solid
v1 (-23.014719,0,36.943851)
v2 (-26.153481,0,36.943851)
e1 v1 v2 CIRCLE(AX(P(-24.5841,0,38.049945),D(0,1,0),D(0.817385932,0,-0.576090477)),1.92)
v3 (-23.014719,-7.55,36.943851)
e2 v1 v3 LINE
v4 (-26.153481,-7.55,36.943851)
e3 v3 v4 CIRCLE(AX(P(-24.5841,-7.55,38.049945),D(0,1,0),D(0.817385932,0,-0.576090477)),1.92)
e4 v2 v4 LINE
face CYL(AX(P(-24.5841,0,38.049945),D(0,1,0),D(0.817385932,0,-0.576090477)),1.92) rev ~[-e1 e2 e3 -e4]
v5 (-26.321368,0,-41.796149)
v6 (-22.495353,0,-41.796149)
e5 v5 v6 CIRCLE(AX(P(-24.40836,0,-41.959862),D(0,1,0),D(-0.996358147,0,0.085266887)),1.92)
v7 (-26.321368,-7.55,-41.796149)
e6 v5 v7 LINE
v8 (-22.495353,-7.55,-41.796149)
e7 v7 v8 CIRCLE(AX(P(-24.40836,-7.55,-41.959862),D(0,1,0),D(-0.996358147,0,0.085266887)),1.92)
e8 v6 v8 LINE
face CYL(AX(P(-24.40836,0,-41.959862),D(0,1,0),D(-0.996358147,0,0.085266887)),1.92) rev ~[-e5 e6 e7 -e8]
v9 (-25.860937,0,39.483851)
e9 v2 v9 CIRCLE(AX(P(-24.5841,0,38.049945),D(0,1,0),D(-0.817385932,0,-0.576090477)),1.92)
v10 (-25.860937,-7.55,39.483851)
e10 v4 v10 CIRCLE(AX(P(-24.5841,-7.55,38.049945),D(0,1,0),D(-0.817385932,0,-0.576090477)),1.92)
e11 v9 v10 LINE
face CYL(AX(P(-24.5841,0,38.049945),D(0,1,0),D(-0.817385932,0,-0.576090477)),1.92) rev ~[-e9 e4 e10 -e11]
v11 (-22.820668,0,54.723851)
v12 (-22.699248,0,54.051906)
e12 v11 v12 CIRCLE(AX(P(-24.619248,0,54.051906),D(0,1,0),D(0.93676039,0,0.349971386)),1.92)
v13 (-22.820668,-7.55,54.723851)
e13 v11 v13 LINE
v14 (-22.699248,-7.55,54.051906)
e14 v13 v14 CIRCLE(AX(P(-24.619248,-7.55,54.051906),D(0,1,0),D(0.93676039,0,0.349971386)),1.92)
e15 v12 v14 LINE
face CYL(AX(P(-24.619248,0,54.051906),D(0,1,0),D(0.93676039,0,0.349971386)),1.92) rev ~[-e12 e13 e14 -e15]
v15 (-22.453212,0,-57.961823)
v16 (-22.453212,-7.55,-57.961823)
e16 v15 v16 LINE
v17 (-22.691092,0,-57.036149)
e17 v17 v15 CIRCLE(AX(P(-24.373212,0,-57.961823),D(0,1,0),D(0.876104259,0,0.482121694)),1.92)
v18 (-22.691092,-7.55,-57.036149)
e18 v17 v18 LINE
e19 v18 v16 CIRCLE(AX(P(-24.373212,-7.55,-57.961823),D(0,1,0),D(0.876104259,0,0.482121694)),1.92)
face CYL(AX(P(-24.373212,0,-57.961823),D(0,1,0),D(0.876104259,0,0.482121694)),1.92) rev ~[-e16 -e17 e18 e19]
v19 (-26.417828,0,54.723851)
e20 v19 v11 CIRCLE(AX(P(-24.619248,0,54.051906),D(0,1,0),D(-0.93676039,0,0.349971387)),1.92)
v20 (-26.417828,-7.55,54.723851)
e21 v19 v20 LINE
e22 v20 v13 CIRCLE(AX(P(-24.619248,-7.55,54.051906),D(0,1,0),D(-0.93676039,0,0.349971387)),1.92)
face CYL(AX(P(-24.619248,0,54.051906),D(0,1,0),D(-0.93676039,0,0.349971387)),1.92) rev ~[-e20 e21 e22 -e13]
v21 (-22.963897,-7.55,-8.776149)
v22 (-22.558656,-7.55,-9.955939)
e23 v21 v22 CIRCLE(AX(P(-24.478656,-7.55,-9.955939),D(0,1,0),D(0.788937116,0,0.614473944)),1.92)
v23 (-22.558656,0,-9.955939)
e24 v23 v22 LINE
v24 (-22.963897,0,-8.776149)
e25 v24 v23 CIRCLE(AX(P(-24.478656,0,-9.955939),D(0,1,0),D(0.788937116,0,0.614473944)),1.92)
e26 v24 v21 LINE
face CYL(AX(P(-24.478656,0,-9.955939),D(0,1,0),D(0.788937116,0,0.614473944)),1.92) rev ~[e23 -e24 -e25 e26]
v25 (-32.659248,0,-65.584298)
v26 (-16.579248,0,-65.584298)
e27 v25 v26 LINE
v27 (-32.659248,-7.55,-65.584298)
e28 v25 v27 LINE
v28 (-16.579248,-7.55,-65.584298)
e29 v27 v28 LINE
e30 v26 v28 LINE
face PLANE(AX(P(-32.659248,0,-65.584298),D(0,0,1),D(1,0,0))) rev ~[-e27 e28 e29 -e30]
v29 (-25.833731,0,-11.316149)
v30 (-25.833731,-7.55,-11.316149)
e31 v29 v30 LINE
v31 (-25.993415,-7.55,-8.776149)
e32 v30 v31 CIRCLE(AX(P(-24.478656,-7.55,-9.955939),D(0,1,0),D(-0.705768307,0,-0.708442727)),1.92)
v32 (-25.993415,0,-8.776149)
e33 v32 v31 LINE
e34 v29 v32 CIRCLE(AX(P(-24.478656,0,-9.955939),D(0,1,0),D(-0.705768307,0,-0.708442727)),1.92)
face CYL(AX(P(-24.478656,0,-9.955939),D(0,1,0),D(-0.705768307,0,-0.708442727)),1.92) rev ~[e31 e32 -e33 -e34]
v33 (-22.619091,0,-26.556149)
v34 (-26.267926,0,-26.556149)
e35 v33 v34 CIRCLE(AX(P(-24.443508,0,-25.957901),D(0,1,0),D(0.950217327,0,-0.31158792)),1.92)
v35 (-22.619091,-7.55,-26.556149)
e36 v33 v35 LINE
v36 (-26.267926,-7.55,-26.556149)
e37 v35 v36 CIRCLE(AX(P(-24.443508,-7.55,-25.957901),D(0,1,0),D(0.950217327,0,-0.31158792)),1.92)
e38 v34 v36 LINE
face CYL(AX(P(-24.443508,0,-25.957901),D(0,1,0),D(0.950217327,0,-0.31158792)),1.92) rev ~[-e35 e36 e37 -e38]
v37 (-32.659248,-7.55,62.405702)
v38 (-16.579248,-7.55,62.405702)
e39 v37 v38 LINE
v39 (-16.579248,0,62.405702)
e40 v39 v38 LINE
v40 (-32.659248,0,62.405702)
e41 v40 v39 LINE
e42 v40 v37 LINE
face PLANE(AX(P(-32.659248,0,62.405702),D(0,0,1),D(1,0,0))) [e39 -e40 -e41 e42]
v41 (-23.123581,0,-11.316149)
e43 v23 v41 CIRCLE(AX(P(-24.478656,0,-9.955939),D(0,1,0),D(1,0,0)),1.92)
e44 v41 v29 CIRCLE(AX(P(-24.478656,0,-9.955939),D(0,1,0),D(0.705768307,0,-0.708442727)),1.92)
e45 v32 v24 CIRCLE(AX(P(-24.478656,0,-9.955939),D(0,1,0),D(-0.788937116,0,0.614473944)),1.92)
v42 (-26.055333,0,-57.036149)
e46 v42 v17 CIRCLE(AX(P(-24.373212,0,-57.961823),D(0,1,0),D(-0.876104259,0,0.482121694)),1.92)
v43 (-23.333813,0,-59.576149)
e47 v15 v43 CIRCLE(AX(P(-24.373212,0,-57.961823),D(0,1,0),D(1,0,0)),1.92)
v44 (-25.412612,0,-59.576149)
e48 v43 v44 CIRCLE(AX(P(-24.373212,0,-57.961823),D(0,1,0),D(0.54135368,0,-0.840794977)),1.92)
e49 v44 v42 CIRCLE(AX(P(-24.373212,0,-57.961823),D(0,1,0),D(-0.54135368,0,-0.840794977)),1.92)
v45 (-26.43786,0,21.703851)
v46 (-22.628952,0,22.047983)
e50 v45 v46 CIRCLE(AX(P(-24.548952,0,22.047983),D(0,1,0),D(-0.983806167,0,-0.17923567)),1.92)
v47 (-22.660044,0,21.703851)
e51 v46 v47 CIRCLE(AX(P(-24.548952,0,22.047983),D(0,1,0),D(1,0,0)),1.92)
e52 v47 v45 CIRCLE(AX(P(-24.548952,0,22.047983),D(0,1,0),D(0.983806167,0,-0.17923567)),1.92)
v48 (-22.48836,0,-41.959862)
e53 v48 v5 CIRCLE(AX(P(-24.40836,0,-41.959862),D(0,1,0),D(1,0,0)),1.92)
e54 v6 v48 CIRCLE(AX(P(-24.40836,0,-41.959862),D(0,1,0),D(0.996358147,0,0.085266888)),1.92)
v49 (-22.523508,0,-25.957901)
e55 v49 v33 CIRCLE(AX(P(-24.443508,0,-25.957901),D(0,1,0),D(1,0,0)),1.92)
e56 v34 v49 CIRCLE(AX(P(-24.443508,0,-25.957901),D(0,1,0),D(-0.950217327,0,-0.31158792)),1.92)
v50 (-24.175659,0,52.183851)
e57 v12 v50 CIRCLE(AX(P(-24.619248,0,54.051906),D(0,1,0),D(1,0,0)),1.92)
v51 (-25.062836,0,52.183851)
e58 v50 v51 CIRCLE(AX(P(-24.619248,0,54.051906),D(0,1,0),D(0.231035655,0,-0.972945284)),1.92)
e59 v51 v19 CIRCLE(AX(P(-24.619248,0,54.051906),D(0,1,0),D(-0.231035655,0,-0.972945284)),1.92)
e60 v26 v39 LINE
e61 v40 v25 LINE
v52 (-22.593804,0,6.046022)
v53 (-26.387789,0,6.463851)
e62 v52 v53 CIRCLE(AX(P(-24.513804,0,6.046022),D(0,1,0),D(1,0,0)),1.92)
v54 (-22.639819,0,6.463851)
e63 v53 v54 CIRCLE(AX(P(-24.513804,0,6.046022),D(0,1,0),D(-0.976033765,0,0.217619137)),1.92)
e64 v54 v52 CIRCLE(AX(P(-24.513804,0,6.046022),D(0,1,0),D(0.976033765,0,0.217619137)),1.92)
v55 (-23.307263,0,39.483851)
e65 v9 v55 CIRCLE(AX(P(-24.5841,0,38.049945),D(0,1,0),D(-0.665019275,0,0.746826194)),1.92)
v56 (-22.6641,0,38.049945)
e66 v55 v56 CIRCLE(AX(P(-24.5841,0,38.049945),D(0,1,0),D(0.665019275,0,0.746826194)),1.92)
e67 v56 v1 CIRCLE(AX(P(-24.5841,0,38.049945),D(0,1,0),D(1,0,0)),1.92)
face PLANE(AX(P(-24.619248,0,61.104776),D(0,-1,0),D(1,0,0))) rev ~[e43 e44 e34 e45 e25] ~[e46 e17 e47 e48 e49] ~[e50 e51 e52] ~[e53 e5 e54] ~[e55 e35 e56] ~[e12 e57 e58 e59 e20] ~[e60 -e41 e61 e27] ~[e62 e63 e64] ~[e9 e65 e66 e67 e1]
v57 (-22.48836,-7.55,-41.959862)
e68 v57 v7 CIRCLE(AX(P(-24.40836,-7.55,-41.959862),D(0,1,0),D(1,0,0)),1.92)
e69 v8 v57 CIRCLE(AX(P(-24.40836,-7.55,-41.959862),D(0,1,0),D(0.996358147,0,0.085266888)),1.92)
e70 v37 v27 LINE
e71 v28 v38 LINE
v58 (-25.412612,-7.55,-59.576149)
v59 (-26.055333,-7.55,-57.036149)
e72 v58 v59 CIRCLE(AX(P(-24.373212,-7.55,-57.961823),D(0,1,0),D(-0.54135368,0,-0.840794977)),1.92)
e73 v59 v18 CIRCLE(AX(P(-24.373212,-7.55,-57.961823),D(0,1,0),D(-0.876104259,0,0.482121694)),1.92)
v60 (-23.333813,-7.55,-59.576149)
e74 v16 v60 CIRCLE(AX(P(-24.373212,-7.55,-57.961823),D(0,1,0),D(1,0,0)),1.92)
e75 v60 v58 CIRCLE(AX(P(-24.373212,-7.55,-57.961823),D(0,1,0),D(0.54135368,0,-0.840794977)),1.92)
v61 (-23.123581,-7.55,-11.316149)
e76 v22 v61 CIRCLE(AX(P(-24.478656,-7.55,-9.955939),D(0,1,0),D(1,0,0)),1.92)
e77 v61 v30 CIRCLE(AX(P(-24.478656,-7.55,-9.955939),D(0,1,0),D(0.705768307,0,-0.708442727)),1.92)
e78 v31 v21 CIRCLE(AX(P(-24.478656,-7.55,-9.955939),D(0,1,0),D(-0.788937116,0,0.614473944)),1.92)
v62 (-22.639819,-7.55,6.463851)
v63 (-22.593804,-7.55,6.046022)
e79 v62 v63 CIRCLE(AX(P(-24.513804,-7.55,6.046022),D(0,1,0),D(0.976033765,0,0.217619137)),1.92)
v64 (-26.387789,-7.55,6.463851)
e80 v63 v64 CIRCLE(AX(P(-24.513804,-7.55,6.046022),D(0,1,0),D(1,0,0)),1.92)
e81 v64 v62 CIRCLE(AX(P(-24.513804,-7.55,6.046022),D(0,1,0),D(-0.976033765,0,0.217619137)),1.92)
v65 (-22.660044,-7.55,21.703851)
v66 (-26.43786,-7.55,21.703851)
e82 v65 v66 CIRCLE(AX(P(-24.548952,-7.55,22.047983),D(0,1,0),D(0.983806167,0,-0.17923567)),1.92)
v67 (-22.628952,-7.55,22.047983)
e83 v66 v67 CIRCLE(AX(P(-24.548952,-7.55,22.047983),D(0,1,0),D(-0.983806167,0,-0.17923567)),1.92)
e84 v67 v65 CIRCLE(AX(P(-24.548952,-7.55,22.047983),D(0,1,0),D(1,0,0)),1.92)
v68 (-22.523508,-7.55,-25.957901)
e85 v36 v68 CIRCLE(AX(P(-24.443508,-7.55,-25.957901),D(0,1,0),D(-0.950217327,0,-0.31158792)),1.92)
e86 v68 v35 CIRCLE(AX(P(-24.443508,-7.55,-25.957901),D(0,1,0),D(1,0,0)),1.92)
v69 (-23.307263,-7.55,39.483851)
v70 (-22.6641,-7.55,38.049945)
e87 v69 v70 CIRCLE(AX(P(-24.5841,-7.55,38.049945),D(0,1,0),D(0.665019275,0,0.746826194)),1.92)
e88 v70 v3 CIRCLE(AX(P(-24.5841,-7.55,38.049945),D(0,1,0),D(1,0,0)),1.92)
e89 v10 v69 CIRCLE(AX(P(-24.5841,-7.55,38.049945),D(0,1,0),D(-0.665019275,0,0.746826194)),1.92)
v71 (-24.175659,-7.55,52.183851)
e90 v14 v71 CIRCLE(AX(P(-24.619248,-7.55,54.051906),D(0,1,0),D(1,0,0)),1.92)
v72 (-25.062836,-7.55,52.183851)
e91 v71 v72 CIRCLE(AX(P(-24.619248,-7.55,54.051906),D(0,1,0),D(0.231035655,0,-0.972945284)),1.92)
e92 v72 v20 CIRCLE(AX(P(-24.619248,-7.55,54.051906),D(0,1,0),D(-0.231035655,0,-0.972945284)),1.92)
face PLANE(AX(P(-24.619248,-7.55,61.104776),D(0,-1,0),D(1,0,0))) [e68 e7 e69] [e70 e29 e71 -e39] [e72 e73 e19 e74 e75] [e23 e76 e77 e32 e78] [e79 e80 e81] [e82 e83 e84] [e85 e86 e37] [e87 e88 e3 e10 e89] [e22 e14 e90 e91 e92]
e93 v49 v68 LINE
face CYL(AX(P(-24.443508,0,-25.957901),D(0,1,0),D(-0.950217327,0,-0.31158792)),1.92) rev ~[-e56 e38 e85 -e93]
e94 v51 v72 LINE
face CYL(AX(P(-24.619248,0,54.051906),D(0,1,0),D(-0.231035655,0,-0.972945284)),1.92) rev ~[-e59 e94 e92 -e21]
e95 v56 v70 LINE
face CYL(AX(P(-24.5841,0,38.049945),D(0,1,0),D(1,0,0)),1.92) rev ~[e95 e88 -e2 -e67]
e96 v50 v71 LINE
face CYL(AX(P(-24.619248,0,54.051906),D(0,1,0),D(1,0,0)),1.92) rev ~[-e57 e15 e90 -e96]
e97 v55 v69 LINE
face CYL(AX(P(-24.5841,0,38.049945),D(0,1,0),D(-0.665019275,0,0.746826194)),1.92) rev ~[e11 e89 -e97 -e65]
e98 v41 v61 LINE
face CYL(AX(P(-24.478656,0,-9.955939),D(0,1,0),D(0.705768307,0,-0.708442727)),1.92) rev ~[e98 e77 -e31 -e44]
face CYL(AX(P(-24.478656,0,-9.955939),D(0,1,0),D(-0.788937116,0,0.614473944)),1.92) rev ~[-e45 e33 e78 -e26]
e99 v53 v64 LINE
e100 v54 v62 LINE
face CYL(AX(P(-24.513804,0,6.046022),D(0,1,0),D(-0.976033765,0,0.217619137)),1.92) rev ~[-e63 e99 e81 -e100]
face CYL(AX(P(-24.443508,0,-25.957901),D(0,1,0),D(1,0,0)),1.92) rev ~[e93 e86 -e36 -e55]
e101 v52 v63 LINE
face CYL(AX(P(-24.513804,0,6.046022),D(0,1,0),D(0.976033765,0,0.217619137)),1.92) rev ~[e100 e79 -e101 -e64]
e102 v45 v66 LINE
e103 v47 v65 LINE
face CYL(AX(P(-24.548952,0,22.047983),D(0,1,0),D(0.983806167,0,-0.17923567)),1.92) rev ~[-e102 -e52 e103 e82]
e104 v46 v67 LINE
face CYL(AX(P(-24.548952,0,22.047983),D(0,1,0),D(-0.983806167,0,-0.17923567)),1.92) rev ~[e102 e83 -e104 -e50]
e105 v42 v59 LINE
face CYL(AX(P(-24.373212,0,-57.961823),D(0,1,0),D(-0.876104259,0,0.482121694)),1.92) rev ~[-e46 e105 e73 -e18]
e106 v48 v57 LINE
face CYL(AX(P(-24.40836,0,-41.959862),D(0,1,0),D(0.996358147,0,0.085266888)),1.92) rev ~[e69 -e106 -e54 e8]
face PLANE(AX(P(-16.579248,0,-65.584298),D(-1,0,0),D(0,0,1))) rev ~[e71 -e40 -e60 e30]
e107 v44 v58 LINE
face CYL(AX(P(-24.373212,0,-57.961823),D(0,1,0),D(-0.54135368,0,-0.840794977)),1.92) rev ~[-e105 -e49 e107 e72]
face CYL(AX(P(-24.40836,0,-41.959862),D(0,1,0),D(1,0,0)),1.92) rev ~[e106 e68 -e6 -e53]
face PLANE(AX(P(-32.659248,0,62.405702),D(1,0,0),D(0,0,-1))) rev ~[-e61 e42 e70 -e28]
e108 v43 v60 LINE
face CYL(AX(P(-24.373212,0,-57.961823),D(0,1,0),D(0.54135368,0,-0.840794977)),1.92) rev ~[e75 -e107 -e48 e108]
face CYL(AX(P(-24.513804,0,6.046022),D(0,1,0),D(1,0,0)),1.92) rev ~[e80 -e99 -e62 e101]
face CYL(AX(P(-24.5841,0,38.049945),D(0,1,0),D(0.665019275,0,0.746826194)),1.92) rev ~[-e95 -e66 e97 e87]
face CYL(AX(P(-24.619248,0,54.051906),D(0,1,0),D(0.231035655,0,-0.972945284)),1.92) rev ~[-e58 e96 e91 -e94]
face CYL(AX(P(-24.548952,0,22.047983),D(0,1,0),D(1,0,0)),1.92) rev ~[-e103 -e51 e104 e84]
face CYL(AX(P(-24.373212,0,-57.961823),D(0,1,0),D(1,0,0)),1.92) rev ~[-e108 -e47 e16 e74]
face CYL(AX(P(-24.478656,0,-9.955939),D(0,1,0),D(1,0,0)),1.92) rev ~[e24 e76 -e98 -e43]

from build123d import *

# Parameters (mm, degrees)
F0_W     = 16.08
F0_H     = 2.6018508029
F1_DEPTH = 7.55


# Not quite as in the source:
# - the program builds the solid bodies; features that only make, move or delete a surface that nothing else refers to are left out


with BuildPart() as f1:
    # F0 (on Front) → F1 (new body)
    with BuildSketch(Plane.XZ):
        with Locations((-24.6192478486, 61.1047763503)):
            Rectangle(F0_W, F0_H)
        with BuildLine():
            Line((-16.5792478486, 59.8038509488), (-32.6592478486, 59.8038509488))
            Line((-32.6592478486, 59.8038509488), (-32.6592478486, 57.2638509407))
            Line((-32.6592478486, 57.2638509407), (-32.6592478486, 54.7238509326))
            Line((-32.6592478486, 54.7238509326), (-26.4178277978, 54.7238509326))
            ThreePointArc((-26.4178277978, 54.7238509326), (-24.6192478486, 55.9719058704), (-22.8206678995, 54.7238509326))
            ThreePointArc((-22.8206678995, 54.7238509326), (-22.7298466866, 54.3933194742), (-22.6992478486, 54.0519058704))
            ThreePointArc((-22.6992478486, 54.0519058704), (-23.1129129196, 52.8613786421), (-24.1756593919, 52.1838509245))
            ThreePointArc((-24.1756593919, 52.1838509245), (-24.6192478486, 52.1319058704), (-25.0628363054, 52.1838509245))
            Line((-25.0628363054, 52.1838509245), (-32.6592478486, 52.1838509245))
            Line((-32.6592478486, 52.1838509245), (-32.6592478486, 49.6438509164))
            Line((-32.6592478486, 49.6438509164), (-32.6592478486, 47.1038509083))
            Line((-32.6592478486, 47.1038509083), (-32.6592478486, 44.5638509002))
            Line((-32.6592478486, 44.5638509002), (-32.6592478486, 42.0238508921))
            Line((-32.6592478486, 42.0238508921), (-32.6592478486, 39.483850884))
            Line((-32.6592478486, 39.483850884), (-25.86093695, 39.483850884))
            ThreePointArc((-25.86093695, 39.483850884), (-24.5840999414, 39.9699445923), (-23.3072629328, 39.483850884))
            ThreePointArc((-23.3072629328, 39.483850884), (-22.8322541924, 38.8357158514), (-22.6640999414, 38.0499445923))
            ThreePointArc((-22.6640999414, 38.0499445923), (-22.7538524855, 37.4697771596), (-23.0147189518, 36.9438508759))
            ThreePointArc((-23.0147189518, 36.9438508759), (-24.5840999414, 36.1299445923), (-26.1534809311, 36.9438508759))
            Line((-26.1534809311, 36.9438508759), (-32.6592478486, 36.9438508759))
            Line((-32.6592478486, 36.9438508759), (-32.6592478486, 34.4038508678))
            Line((-32.6592478486, 34.4038508678), (-32.6592478486, 31.8638508597))
            Line((-32.6592478486, 31.8638508597), (-32.6592478486, 29.3238508516))
            Line((-32.6592478486, 29.3238508516), (-32.6592478486, 26.7838508435))
            Line((-32.6592478486, 26.7838508435), (-32.6592478486, 24.2438508354))
            Line((-32.6592478486, 24.2438508354), (-32.6592478486, 21.7038508273))
            Line((-32.6592478486, 21.7038508273), (-32.6592478486, 19.1638508192))
            Line((-32.6592478486, 19.1638508192), (-32.6592478486, 16.623850811))
            Line((-32.6592478486, 16.623850811), (-32.6592478486, 14.0838508029))
            Line((-32.6592478486, 14.0838508029), (-32.6592478486, 11.5438507948))
            Line((-32.6592478486, 11.5438507948), (-32.6592478486, 9.0038507867))
            Line((-32.6592478486, 9.0038507867), (-32.6592478486, 6.4638507786))
            Line((-32.6592478486, 6.4638507786), (-32.6592478486, 3.9238507705))
            Line((-32.6592478486, 3.9238507705), (-32.6592478486, 1.3838507624))
            Line((-32.6592478486, 1.3838507624), (-32.6592478486, -1.1561492457))
            Line((-32.6592478486, -1.1561492457), (-32.6592478486, -3.6961492538))
            Line((-32.6592478486, -3.6961492538), (-32.6592478486, -6.2361492619))
            Line((-32.6592478486, -6.2361492619), (-32.6592478486, -8.77614927))
            Line((-32.6592478486, -8.77614927), (-25.9934154817, -8.77614927))
            ThreePointArc((-25.9934154817, -8.77614927), (-24.4786562199, -8.0359392423), (-22.9638969581, -8.77614927))
            ThreePointArc((-22.9638969581, -8.77614927), (-22.6627903407, -9.3322156588), (-22.5586562199, -9.9559392423))
            ThreePointArc((-22.5586562199, -9.9559392423), (-22.705503056, -10.6923683681), (-23.1235810713, -11.3161492781))
            ThreePointArc((-23.1235810713, -11.3161492781), (-24.4786562199, -11.8759392423), (-25.8337313686, -11.3161492781))
            Line((-25.8337313686, -11.3161492781), (-32.6592478486, -11.3161492781))
            Line((-32.6592478486, -11.3161492781), (-32.6592478486, -13.8561492862))
            Line((-32.6592478486, -13.8561492862), (-32.6592478486, -16.3961492943))
            Line((-32.6592478486, -16.3961492943), (-32.6592478486, -18.9361493024))
            Line((-32.6592478486, -18.9361493024), (-32.6592478486, -21.4761493105))
            Line((-32.6592478486, -21.4761493105), (-32.6592478486, -24.0161493186))
            Line((-32.6592478486, -24.0161493186), (-32.6592478486, -26.5561493267))
            Line((-32.6592478486, -26.5561493267), (-32.6592478486, -29.0961493348))
            Line((-32.6592478486, -29.0961493348), (-32.6592478486, -31.6361493429))
            Line((-32.6592478486, -31.6361493429), (-32.6592478486, -34.176149351))
            Line((-32.6592478486, -34.176149351), (-32.6592478486, -36.7161493591))
            Line((-32.6592478486, -36.7161493591), (-32.6592478486, -39.2561493672))
            Line((-32.6592478486, -39.2561493672), (-32.6592478486, -41.7961493753))
            Line((-32.6592478486, -41.7961493753), (-32.6592478486, -44.3361493834))
            Line((-32.6592478486, -44.3361493834), (-32.6592478486, -46.8761493915))
            Line((-32.6592478486, -46.8761493915), (-32.6592478486, -49.4161493996))
            Line((-32.6592478486, -49.4161493996), (-32.6592478486, -51.9561494077))
            Line((-32.6592478486, -51.9561494077), (-32.6592478486, -54.4961494159))
            Line((-32.6592478486, -54.4961494159), (-32.6592478486, -57.036149424))
            Line((-32.6592478486, -57.036149424), (-26.0553326749, -57.036149424))
            ThreePointArc((-26.0553326749, -57.036149424), (-24.3732124984, -56.0418230768), (-22.6910923218, -57.036149424))
            ThreePointArc((-22.6910923218, -57.036149424), (-22.5136331455, -57.4839479566), (-22.4532124984, -57.9618230768))
            ThreePointArc((-22.4532124984, -57.9618230768), (-22.6876790209, -58.8812668742), (-23.3338134322, -59.5761494321))
            ThreePointArc((-23.3338134322, -59.5761494321), (-24.3732124984, -59.8818230768), (-25.4126115646, -59.5761494321))
            Line((-25.4126115646, -59.5761494321), (-32.6592478486, -59.5761494321))
            Line((-32.6592478486, -59.5761494321), (-32.6592478486, -62.1161494402))
            Line((-32.6592478486, -62.1161494402), (-32.6592478486, -65.5842982483))
            Line((-32.6592478486, -65.5842982483), (-16.5792478486, -65.5842982483))
            Line((-16.5792478486, -65.5842982483), (-16.5792478486, 59.8038509488))
        make_face()
        with BuildLine():
            ThreePointArc((-22.4883604056, -41.9598617986), (-24.4902912462, -43.8781129129), (-26.3213680486, -41.7961493753))
            ThreePointArc((-26.3213680486, -41.7961493753), (-24.4083604056, -40.0398617986), (-22.4953527625, -41.7961493753))
            ThreePointArc((-22.4953527625, -41.7961493753), (-22.4901092913, -41.877930958), (-22.4883604056, -41.9598617986))
        make_face(mode=Mode.SUBTRACT)
        with BuildLine():
            ThreePointArc((-22.6190910453, -26.5561493267), (-24.4435083127, -27.8779005205), (-26.2679255802, -26.5561493267))
            ThreePointArc((-26.2679255802, -26.5561493267), (-24.7464264918, -24.0619467824), (-22.5235083127, -25.9579005205))
            ThreePointArc((-22.5235083127, -25.9579005205), (-22.5475545747, -26.2608186996), (-22.6190910453, -26.5561493267))
        make_face(mode=Mode.SUBTRACT)
        with BuildLine():
            ThreePointArc((-22.5938041271, 6.0460220359), (-24.7239815843, 4.1375604994), (-26.3877889567, 6.4638507786))
            ThreePointArc((-26.3877889567, 6.4638507786), (-24.5138041271, 7.9660220359), (-22.6398192974, 6.4638507786))
            ThreePointArc((-22.6398192974, 6.4638507786), (-22.6053425905, 6.2561994932), (-22.5938041271, 6.0460220359))
        make_face(mode=Mode.SUBTRACT)
        with BuildLine():
            ThreePointArc((-22.6600441933, 21.7038508273), (-24.5489520343, 20.1279833141), (-26.4378598752, 21.7038508273))
            ThreePointArc((-26.4378598752, 21.7038508273), (-24.7217191397, 23.9601944759), (-22.6289520343, 22.0479833141))
            ThreePointArc((-22.6289520343, 22.0479833141), (-22.6367408725, 21.8752162087), (-22.6600441933, 21.7038508273))
        make_face(mode=Mode.SUBTRACT)
        with BuildLine():
            Line((-26.4178277978, 54.7238509326), (-32.6592478486, 54.7238509326))
            Line((-32.6592478486, 54.7238509326), (-32.6592478486, 52.1838509245))
            Line((-32.6592478486, 52.1838509245), (-25.0628363054, 52.1838509245))
            ThreePointArc((-25.0628363054, 52.1838509245), (-26.3132755345, 53.1482078016), (-26.4178277978, 54.7238509326))
        make_face()
        with BuildLine():
            Line((-32.6592478486, -57.036149424), (-32.6592478486, -59.5761494321))
            Line((-32.6592478486, -59.5761494321), (-25.4126115646, -59.5761494321))
            ThreePointArc((-25.4126115646, -59.5761494321), (-26.2345471694, -58.4328148417), (-26.0553326749, -57.036149424))
            Line((-26.0553326749, -57.036149424), (-32.6592478486, -57.036149424))
        make_face()
        with BuildLine():
            Line((-25.86093695, 39.483850884), (-32.6592478486, 39.483850884))
            Line((-32.6592478486, 39.483850884), (-32.6592478486, 36.9438508759))
            Line((-32.6592478486, 36.9438508759), (-26.1534809311, 36.9438508759))
            ThreePointArc((-26.1534809311, 36.9438508759), (-26.4914906287, 38.2696279242), (-25.86093695, 39.483850884))
        make_face()
        with BuildLine():
            Line((-32.6592478486, -8.77614927), (-32.6592478486, -11.3161492781))
            Line((-32.6592478486, -11.3161492781), (-25.8337313686, -11.3161492781))
            ThreePointArc((-25.8337313686, -11.3161492781), (-26.394873169, -10.0764075113), (-25.9934154817, -8.77614927))
            Line((-25.9934154817, -8.77614927), (-32.6592478486, -8.77614927))
        make_face()
    extrude(amount=F1_DEPTH)


solid = f1.part
